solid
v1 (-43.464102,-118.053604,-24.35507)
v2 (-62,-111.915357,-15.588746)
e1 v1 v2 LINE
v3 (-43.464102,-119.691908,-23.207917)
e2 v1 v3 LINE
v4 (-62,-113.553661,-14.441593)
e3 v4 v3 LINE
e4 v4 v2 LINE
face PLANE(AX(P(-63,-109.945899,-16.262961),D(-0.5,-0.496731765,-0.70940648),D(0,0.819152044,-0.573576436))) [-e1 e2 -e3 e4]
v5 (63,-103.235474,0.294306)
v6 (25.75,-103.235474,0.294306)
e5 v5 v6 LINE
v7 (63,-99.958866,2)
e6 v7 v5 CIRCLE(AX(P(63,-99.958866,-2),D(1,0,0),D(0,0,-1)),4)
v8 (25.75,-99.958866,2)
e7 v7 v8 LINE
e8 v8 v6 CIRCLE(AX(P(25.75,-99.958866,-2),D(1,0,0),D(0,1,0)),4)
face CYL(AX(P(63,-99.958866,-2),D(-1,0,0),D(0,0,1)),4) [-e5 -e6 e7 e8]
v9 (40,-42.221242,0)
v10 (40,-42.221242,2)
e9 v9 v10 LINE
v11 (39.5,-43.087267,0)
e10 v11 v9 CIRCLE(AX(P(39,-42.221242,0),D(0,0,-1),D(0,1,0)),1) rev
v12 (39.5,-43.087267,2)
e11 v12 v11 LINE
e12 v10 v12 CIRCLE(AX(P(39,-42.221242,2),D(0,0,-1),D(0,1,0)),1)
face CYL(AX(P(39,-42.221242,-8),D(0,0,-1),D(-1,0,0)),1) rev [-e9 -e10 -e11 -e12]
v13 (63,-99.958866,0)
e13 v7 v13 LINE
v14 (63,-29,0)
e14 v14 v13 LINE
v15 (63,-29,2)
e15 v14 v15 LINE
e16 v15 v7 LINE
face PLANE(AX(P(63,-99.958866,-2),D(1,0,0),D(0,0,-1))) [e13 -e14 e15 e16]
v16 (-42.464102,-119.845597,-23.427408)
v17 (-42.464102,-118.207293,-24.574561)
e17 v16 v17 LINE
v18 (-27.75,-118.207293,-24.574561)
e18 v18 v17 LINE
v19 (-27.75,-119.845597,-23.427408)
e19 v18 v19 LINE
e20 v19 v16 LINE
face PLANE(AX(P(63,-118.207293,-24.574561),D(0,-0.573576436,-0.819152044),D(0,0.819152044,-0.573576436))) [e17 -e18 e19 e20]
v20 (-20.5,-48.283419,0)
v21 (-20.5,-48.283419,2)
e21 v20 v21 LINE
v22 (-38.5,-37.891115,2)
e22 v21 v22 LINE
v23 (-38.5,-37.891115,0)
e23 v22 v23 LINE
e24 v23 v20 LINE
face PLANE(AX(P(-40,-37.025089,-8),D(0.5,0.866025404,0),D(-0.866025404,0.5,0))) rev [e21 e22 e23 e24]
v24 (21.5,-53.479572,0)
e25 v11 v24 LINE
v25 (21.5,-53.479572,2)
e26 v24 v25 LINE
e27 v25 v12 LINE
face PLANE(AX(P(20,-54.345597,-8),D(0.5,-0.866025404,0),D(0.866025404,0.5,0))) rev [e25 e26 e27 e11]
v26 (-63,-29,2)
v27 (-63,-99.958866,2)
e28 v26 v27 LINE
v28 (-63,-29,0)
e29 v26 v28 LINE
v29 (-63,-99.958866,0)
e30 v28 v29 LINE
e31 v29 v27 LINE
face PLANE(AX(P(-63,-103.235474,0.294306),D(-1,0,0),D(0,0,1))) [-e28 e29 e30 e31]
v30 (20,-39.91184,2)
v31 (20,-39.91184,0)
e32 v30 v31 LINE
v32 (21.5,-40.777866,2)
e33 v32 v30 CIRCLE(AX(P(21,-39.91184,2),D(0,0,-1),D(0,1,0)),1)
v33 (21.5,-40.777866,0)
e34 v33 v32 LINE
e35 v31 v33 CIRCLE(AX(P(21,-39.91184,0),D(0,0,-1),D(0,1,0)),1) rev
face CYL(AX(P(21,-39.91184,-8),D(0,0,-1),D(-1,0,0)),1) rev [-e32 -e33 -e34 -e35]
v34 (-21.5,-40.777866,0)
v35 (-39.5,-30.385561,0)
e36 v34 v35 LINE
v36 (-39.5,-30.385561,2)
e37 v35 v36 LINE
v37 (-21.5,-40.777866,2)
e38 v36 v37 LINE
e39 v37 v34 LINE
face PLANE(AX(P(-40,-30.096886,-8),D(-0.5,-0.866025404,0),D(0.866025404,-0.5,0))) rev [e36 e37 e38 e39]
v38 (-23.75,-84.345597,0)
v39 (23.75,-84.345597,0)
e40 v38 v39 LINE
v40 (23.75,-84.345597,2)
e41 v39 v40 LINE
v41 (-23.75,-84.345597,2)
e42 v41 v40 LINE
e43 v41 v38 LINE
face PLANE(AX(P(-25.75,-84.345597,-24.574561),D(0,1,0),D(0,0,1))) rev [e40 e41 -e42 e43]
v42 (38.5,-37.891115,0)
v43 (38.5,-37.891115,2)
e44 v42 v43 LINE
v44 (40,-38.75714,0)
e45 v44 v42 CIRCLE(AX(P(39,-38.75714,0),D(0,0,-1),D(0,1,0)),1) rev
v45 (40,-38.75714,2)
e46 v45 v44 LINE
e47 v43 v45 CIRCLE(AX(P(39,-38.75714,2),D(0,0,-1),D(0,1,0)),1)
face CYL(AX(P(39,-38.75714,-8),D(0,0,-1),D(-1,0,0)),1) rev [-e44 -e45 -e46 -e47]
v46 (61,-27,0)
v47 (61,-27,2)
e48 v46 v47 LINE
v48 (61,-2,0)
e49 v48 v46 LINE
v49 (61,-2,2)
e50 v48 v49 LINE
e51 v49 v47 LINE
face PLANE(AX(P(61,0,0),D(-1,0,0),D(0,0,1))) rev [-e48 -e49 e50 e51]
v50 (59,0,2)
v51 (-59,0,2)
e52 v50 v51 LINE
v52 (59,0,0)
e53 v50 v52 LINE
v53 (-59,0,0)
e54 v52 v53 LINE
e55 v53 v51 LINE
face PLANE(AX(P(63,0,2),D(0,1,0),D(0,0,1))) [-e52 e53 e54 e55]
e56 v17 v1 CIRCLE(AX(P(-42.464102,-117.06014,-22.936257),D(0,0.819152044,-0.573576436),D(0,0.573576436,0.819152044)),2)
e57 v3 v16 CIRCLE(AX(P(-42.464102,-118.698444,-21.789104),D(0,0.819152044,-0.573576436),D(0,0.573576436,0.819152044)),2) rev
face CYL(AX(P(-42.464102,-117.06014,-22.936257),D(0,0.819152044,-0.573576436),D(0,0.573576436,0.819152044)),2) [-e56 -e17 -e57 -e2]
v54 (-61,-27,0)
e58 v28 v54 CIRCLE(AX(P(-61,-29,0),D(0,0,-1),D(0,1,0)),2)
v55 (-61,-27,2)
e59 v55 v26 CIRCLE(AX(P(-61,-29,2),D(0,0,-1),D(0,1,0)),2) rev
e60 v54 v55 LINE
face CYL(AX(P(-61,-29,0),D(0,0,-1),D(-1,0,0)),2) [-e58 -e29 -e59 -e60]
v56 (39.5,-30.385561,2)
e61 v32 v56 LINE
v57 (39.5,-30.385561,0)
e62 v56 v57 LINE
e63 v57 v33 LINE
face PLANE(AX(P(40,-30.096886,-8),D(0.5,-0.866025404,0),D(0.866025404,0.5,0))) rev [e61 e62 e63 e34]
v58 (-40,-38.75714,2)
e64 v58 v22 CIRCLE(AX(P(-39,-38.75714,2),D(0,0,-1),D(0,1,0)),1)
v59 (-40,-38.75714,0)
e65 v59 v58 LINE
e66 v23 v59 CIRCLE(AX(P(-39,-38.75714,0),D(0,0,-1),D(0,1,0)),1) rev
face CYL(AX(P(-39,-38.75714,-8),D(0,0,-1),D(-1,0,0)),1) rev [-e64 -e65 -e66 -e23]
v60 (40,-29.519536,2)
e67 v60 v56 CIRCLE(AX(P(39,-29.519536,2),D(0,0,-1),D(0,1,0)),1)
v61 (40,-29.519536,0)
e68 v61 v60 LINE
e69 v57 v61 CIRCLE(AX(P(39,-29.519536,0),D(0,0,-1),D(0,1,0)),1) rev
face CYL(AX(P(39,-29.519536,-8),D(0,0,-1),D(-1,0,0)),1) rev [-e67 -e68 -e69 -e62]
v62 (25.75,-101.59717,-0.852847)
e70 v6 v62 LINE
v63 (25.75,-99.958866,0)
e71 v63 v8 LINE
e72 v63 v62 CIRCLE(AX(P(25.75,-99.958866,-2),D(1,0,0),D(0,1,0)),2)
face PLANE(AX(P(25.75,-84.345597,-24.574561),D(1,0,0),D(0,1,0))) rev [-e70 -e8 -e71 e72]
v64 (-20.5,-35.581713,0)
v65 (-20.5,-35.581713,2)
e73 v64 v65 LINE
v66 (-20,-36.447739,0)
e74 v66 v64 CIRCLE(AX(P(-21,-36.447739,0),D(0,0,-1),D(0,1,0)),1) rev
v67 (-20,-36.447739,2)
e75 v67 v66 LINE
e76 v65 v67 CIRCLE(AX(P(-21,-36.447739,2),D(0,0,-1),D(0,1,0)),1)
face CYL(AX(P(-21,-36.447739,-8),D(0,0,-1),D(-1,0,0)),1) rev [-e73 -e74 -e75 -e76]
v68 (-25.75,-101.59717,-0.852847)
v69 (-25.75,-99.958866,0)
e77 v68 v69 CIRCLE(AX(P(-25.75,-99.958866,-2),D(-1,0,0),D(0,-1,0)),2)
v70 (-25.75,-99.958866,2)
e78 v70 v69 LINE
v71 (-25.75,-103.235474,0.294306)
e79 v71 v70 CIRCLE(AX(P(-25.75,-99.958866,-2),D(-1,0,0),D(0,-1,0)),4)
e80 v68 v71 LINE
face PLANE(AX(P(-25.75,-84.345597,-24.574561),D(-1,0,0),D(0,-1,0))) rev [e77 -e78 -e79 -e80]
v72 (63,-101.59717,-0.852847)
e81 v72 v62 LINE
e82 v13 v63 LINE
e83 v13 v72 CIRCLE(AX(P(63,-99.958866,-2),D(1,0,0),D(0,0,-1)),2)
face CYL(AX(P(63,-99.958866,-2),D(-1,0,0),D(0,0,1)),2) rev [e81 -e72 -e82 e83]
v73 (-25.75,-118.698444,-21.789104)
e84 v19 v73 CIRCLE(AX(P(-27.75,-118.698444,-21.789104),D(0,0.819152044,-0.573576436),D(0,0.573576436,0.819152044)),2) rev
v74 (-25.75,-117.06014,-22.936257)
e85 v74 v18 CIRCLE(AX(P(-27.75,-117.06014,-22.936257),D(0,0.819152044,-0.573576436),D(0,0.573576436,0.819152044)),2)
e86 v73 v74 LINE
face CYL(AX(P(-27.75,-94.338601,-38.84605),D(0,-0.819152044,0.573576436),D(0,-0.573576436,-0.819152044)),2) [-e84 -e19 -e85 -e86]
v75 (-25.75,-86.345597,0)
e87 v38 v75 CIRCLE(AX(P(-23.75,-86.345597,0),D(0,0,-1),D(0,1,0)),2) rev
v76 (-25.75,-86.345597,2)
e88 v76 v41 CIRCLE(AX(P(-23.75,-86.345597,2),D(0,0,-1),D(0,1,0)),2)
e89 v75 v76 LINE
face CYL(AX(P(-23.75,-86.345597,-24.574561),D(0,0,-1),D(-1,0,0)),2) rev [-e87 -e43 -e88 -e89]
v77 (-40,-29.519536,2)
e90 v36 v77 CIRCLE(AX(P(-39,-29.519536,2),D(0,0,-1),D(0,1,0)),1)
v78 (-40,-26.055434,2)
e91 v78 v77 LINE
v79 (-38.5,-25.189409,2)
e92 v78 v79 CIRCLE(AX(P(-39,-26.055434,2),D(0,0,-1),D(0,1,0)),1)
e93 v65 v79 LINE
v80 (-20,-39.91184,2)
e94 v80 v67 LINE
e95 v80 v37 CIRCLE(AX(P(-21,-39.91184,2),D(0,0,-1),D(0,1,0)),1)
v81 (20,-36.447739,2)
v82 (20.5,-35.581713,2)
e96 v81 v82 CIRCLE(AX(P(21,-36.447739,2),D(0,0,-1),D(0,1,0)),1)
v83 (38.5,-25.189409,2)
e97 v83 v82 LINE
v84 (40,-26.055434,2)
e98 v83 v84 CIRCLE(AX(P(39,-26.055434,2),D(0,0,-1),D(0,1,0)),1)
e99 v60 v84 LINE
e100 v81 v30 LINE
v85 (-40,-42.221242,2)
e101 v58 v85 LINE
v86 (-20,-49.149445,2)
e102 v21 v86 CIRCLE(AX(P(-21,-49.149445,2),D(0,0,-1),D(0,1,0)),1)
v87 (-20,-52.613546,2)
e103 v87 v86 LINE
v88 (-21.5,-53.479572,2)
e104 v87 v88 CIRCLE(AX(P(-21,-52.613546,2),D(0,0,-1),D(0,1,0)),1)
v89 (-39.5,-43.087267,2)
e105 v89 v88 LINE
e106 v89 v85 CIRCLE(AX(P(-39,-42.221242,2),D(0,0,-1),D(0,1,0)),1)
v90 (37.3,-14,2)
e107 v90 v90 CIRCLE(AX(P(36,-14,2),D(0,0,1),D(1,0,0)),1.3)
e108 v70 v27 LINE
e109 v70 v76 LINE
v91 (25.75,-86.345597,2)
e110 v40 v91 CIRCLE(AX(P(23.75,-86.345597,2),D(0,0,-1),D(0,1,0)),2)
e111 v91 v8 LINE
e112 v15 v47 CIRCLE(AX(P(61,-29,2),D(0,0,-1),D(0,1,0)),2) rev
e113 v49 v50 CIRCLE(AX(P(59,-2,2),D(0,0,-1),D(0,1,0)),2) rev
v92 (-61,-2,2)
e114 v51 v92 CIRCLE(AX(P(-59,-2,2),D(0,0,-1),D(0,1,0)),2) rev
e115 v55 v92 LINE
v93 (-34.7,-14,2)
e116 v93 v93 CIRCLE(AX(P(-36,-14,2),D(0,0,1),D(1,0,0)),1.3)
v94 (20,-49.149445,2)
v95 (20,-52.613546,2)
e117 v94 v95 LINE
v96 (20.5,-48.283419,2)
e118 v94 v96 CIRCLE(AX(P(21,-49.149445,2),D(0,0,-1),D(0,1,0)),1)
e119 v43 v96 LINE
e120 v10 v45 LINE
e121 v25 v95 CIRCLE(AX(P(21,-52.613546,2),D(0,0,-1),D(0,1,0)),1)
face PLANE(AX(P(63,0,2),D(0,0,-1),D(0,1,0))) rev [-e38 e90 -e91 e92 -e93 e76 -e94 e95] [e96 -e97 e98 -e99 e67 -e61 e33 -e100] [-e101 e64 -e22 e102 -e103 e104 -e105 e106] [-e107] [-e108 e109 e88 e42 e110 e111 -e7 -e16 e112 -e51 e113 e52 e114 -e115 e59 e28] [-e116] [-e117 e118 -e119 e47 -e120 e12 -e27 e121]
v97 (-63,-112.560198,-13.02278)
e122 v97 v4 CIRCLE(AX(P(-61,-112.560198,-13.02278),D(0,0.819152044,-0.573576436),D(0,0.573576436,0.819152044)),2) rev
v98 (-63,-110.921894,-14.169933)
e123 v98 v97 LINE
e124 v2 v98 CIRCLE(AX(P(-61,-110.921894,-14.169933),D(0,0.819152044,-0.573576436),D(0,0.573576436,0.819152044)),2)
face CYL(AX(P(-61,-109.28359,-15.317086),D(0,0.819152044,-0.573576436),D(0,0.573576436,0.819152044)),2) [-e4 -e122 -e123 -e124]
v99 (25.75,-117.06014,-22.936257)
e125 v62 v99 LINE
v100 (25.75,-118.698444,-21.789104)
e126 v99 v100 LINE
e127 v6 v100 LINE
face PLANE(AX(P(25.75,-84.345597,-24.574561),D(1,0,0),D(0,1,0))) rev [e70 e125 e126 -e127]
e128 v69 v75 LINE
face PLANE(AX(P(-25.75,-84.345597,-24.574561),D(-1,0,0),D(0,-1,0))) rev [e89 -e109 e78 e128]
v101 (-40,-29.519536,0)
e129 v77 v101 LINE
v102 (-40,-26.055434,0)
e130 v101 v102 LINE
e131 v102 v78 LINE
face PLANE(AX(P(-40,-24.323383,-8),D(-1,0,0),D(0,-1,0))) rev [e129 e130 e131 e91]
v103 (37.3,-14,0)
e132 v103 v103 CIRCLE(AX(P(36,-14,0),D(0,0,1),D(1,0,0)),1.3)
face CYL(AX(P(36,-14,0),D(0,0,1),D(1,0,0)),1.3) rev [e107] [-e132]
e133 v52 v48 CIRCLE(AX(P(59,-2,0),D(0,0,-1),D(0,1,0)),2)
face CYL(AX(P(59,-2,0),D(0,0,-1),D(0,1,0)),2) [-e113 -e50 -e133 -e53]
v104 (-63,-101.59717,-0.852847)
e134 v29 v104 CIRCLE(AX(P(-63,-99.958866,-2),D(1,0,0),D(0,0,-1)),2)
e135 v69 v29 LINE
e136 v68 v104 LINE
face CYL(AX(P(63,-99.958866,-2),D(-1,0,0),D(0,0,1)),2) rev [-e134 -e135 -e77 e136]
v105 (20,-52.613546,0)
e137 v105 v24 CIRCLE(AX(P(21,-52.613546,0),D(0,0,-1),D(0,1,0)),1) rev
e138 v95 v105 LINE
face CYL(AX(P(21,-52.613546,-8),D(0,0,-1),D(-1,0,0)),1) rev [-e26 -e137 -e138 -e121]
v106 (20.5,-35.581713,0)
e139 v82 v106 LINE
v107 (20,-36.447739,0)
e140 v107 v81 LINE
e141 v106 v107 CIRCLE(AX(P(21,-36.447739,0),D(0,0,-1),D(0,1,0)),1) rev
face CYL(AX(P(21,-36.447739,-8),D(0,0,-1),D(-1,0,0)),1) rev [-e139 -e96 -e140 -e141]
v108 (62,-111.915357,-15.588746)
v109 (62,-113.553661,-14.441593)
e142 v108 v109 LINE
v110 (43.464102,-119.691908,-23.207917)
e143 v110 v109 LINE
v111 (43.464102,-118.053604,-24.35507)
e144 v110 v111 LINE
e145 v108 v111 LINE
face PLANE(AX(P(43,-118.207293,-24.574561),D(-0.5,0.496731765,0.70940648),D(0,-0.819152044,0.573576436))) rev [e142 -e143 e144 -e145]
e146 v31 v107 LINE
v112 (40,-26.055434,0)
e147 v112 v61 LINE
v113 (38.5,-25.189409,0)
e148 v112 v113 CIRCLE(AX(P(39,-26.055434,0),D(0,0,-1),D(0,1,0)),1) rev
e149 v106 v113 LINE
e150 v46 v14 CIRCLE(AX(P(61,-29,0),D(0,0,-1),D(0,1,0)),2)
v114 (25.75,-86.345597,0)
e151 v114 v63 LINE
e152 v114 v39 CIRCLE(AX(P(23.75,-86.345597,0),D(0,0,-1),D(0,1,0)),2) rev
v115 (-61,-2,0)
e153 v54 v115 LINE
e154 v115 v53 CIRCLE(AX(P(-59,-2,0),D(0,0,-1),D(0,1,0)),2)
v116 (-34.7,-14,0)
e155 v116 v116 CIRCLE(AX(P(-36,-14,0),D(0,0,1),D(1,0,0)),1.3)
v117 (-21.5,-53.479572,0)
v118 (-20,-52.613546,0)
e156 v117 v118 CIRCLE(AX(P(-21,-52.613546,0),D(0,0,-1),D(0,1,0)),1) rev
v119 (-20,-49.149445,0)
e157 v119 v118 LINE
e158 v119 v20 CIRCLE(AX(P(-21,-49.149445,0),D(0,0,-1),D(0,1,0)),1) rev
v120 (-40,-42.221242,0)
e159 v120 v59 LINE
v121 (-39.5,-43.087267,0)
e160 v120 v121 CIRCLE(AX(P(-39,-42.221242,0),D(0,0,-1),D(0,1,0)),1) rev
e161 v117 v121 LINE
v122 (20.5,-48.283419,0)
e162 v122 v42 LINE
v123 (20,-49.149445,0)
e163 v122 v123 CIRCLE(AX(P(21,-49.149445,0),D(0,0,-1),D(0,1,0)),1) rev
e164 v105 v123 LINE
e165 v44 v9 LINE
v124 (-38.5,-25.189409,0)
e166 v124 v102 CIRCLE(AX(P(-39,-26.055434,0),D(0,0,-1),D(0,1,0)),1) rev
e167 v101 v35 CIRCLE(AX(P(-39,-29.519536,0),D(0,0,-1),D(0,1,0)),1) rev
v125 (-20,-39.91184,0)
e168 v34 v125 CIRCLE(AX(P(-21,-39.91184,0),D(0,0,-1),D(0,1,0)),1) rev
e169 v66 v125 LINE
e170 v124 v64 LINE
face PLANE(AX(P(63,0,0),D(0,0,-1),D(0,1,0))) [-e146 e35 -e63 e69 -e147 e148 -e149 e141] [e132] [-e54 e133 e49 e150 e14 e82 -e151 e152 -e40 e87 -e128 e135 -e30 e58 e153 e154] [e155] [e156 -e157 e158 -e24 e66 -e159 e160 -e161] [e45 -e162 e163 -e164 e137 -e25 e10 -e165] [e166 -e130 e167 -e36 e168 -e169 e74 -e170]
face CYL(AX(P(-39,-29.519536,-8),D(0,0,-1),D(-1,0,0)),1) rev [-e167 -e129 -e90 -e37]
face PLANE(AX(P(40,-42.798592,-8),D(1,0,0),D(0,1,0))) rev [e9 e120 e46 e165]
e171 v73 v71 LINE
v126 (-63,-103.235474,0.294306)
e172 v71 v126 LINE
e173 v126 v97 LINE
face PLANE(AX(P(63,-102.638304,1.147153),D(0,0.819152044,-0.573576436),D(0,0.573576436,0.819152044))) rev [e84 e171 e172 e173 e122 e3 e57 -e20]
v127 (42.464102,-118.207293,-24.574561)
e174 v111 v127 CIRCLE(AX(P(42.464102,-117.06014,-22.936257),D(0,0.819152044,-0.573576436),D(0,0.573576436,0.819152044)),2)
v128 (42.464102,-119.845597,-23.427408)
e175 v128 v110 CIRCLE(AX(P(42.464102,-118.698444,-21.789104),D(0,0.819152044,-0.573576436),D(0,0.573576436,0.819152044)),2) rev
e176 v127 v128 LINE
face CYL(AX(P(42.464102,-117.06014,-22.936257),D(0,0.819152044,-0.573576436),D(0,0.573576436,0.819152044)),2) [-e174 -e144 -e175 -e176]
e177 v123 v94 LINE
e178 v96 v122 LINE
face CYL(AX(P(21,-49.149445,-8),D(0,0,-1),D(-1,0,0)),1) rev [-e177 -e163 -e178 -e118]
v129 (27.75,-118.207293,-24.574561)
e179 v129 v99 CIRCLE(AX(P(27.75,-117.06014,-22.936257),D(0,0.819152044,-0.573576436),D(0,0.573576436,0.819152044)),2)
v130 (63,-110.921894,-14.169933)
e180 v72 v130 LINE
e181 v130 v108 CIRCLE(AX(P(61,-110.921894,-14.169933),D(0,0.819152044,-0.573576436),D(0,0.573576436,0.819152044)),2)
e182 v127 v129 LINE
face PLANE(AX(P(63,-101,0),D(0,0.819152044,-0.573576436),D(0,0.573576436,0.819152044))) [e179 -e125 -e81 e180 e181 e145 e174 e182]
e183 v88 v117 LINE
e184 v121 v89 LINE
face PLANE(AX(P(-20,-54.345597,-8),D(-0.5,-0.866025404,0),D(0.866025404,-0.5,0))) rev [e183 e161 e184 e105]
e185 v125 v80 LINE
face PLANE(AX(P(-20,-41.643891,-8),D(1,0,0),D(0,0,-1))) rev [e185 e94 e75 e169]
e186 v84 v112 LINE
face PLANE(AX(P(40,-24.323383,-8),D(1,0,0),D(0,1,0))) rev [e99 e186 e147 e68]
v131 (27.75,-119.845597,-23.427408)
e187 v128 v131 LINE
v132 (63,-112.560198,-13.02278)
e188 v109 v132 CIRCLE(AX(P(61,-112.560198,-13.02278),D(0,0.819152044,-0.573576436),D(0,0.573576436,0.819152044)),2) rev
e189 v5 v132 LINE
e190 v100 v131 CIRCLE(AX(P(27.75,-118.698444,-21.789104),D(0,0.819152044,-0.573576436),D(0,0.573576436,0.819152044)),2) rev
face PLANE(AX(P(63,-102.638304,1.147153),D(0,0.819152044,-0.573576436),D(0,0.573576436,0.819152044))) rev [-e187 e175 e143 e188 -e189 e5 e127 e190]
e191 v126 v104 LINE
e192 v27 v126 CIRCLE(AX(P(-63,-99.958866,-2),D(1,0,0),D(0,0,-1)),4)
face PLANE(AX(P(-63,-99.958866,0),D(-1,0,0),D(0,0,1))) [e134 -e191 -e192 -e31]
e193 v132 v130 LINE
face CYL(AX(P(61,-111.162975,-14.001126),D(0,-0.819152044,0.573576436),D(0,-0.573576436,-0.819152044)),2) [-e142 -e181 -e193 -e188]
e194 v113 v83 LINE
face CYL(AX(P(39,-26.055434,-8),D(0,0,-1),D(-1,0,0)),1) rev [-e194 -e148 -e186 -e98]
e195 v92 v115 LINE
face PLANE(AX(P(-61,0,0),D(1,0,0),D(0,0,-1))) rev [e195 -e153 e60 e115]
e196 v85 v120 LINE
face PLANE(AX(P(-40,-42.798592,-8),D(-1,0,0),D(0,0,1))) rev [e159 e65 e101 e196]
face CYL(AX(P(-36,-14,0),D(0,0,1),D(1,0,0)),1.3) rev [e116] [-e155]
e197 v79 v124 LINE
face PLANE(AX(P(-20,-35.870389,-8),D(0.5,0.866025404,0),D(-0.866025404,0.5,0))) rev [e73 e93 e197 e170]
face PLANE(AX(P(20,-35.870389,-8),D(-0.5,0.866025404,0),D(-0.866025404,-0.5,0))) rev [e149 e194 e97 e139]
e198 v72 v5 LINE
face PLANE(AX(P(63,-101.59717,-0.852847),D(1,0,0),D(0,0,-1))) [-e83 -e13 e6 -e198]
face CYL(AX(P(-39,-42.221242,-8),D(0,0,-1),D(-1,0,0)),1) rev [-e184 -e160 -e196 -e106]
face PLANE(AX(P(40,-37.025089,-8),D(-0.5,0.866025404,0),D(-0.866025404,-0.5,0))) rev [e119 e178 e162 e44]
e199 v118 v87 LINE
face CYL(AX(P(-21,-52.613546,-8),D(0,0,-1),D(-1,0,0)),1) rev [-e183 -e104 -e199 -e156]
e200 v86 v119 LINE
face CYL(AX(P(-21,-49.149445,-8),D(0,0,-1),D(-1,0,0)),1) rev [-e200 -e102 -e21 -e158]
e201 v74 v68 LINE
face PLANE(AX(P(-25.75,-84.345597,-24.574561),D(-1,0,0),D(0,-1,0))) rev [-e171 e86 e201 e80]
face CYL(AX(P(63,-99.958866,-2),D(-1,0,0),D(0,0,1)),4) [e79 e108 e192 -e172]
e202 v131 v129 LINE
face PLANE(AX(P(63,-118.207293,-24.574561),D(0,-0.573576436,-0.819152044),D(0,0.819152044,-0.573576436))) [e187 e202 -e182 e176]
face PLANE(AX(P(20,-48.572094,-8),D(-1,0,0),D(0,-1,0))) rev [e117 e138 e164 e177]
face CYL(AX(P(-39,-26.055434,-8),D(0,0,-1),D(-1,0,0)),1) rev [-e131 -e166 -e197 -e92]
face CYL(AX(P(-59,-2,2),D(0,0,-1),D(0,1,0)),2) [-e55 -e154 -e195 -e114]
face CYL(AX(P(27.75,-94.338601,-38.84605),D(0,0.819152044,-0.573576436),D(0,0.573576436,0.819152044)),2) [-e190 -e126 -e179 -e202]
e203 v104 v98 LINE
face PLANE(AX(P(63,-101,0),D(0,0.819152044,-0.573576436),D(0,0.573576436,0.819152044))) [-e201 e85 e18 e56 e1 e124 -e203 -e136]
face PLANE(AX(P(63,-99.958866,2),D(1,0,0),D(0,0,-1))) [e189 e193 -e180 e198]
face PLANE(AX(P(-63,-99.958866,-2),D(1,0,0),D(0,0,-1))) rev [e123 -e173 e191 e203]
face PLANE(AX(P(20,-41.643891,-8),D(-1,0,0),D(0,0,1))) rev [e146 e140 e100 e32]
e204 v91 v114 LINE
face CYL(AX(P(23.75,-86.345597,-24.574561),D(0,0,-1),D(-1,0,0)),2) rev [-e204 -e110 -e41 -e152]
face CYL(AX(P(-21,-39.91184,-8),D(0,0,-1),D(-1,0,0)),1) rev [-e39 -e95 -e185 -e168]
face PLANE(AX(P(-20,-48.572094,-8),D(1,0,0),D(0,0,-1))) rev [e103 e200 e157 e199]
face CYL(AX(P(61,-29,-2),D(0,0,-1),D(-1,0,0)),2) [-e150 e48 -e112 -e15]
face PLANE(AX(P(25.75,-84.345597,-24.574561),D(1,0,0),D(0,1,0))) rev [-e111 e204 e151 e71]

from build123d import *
from OCP.BRepFilletAPI import BRepFilletAPI_MakeChamfer

# Parameters (mm, degrees)
BASE_FLANGE1_DEPTH      = 63
CUT_EXTRUDE1_DEPTH      = 138.978891404
CUT_EXTRUDE1_DEPTH_BACK = 138.978891404
SKETCH2_W               = 51.5
SKETCH2_H               = 35.5
FILLET1_R               = 2
CHAMFER1_SIZE           = 20
CHAMFER1_SIZE2          = 11.547005384
SKETCH3_R               = 1.3
CUT_EXTRUDE2_DEPTH      = 2
SKETCH4_W               = 2
SKETCH4_H               = 27
CUT_EXTRUDE3_DEPTH      = 2
FILLET2_R               = 2
CUT_EXTRUDE4_DEPTH      = 10
FILLET3_R               = 1


# Sheet-metal steps are written as plain solids
with BuildPart() as part:
    # Sketch1 → Base-Flange1 (new, symmetric)
    with BuildSketch(Plane(origin=(0, 0, 0), x_dir=(0, 0, -1), z_dir=(1, 0, 0))):
        with BuildLine():
            Line((0, 0), (0, -99.958865899))
            ThreePointArc((0, -99.958865899), (0.225978334, -100.882363125), (0.852847127, -101.597169987))
            Line((0.852847127, -101.597169987), (24.574561329, -118.207293091))
            Line((24.574561329, -118.207293091), (23.427408456, -119.845597179))
            Line((23.427408456, -119.845597179), (-0.294305745, -103.235474076))
            ThreePointArc((-0.294305745, -103.235474076), (-1.548043333, -101.805860352), (-2, -99.958865899))
            Line((-2, -99.958865899), (-2, 0))
            Line((-2, 0), (0, 0))
        make_face()
    extrude(amount=BASE_FLANGE1_DEPTH, both=True)

    # Sketch2 → Cut-Extrude1 (cut, two sides: drawn at the far end of the back side and taken through both)
    with BuildSketch(Plane.XY.offset(2).offset(-CUT_EXTRUDE1_DEPTH_BACK)):
        with Locations((0, -102.095597179)):
            Rectangle(SKETCH2_W, SKETCH2_H)
    extrude(amount=CUT_EXTRUDE1_DEPTH + CUT_EXTRUDE1_DEPTH_BACK, mode=Mode.SUBTRACT)

    # Fillet1
    fillet1_edges = [part.edges().sort_by_distance(p)[0] for p in [
        (-25.75, -84.345597179, 1),
        (25.75, -84.345597179, 1),
    ]]
    fillet(fillet1_edges, radius=FILLET1_R)

    # Chamfer1: one chamfer whose edges measure the first distance from different faces: ONE call of the kernel's chamfer builder (chamfer() names one face for all edges)
    chamfer1_edges_1 = [part.edges().sort_by_distance(p)[0] for p in [
        (63, -119.026445135, -24.000984892),
    ]]
    chamfer1_side_1 = [part.faces().sort_by_distance(p)[0] for p in [
        (44.375, -119.026445135, -24.000984892),
    ]]
    chamfer1_edges_2 = [part.edges().sort_by_distance(p)[0] for p in [
        (-63, -119.026445135, -24.000984892),
    ]]
    chamfer1_side_2 = [part.faces().sort_by_distance(p)[0] for p in [
        (-44.375, -119.026445135, -24.000984892),
    ]]
    chamfer1 = BRepFilletAPI_MakeChamfer(part.part.solid().wrapped)
    for e in chamfer1_edges_1:
        chamfer1.Add(CHAMFER1_SIZE, CHAMFER1_SIZE2, e.wrapped, chamfer1_side_1[0].wrapped)  # the first distance lies on this face
    for e in chamfer1_edges_2:
        chamfer1.Add(CHAMFER1_SIZE, CHAMFER1_SIZE2, e.wrapped, chamfer1_side_2[0].wrapped)  # the first distance lies on this face
    add(Compound.cast(chamfer1.Shape()), mode=Mode.REPLACE)

    # Sketch3 → Cut-Extrude2 (cut)
    with BuildSketch(Plane.XY.offset(2)):
        with Locations((-36, -14)):
            Circle(SKETCH3_R)
        with Locations((36, -14)):
            Circle(SKETCH3_R)
    extrude(amount=-CUT_EXTRUDE2_DEPTH, mode=Mode.SUBTRACT)

    # Sketch4 → Cut-Extrude3 (cut)
    with BuildSketch(Plane.XY.offset(2)):
        with Locations((-62, -13.5)):
            Rectangle(SKETCH4_W, SKETCH4_H)
        with Locations((62, -13.5)):
            Rectangle(SKETCH4_W, SKETCH4_H)
    extrude(amount=-CUT_EXTRUDE3_DEPTH, mode=Mode.SUBTRACT)

    # Fillet2
    fillet2_edges = [part.edges().sort_by_distance(p)[0] for p in [
        (63, -112.403354936, -14.542231827),
        (43, -119.026445135, -24.000984892),
        (25.75, -119.026445135, -24.000984892),
        (-63, -112.403354936, -14.542231827),
        (-43, -119.026445135, -24.000984892),
        (-25.75, -119.026445135, -24.000984892),
        (-63, -27, 1),
        (63, -27, 1),
        (61, 0, 1),
        (-61, 0, 1),
    ]]
    fillet(fillet2_edges, radius=FILLET2_R - 0.0001)  # a hair under: the kernel refuses the full size

    # Sketch5 → Cut-Extrude4 (cut)
    with BuildSketch(Plane.XY.offset(2)):
        Polygon((-40, -24.323383181), (-40, -30.096885873), (-20, -41.643891257), (-20, -35.870388565), align=None)
        Polygon((-40, -37.025089103), (-20, -48.572094487), (-20, -54.345597179), (-40, -42.798591795), align=None)
        Polygon((40, -42.798591795), (40, -37.025089103), (20, -48.572094487), (20, -54.345597179), align=None)
        Polygon((20, -35.870388565), (40, -24.323383181), (40, -30.096885873), (20, -41.643891257), align=None)
    extrude(amount=-CUT_EXTRUDE4_DEPTH, mode=Mode.SUBTRACT)

    # Fillet3
    fillet3_edges = [part.edges().sort_by_distance(p)[0] for p in [
        (-40, -42.798591795, 1),
        (-40, -37.025089103, 1),
        (-20, -48.572094487, 1),
        (-20, -54.345597179, 1),
        (40, -42.798591795, 1),
        (20, -54.345597179, 1),
        (20, -48.572094487, 1),
        (40, -37.025089103, 1),
        (20, -41.643891257, 1),
        (20, -35.870388565, 1),
        (40, -24.323383181, 1),
        (40, -30.096885873, 1),
        (-40, -24.323383181, 1),
        (-20, -35.870388565, 1),
        (-20, -41.643891257, 1),
        (-40, -30.096885873, 1),
    ]]
    fillet(fillet3_edges, radius=FILLET3_R)


solid = part.part
